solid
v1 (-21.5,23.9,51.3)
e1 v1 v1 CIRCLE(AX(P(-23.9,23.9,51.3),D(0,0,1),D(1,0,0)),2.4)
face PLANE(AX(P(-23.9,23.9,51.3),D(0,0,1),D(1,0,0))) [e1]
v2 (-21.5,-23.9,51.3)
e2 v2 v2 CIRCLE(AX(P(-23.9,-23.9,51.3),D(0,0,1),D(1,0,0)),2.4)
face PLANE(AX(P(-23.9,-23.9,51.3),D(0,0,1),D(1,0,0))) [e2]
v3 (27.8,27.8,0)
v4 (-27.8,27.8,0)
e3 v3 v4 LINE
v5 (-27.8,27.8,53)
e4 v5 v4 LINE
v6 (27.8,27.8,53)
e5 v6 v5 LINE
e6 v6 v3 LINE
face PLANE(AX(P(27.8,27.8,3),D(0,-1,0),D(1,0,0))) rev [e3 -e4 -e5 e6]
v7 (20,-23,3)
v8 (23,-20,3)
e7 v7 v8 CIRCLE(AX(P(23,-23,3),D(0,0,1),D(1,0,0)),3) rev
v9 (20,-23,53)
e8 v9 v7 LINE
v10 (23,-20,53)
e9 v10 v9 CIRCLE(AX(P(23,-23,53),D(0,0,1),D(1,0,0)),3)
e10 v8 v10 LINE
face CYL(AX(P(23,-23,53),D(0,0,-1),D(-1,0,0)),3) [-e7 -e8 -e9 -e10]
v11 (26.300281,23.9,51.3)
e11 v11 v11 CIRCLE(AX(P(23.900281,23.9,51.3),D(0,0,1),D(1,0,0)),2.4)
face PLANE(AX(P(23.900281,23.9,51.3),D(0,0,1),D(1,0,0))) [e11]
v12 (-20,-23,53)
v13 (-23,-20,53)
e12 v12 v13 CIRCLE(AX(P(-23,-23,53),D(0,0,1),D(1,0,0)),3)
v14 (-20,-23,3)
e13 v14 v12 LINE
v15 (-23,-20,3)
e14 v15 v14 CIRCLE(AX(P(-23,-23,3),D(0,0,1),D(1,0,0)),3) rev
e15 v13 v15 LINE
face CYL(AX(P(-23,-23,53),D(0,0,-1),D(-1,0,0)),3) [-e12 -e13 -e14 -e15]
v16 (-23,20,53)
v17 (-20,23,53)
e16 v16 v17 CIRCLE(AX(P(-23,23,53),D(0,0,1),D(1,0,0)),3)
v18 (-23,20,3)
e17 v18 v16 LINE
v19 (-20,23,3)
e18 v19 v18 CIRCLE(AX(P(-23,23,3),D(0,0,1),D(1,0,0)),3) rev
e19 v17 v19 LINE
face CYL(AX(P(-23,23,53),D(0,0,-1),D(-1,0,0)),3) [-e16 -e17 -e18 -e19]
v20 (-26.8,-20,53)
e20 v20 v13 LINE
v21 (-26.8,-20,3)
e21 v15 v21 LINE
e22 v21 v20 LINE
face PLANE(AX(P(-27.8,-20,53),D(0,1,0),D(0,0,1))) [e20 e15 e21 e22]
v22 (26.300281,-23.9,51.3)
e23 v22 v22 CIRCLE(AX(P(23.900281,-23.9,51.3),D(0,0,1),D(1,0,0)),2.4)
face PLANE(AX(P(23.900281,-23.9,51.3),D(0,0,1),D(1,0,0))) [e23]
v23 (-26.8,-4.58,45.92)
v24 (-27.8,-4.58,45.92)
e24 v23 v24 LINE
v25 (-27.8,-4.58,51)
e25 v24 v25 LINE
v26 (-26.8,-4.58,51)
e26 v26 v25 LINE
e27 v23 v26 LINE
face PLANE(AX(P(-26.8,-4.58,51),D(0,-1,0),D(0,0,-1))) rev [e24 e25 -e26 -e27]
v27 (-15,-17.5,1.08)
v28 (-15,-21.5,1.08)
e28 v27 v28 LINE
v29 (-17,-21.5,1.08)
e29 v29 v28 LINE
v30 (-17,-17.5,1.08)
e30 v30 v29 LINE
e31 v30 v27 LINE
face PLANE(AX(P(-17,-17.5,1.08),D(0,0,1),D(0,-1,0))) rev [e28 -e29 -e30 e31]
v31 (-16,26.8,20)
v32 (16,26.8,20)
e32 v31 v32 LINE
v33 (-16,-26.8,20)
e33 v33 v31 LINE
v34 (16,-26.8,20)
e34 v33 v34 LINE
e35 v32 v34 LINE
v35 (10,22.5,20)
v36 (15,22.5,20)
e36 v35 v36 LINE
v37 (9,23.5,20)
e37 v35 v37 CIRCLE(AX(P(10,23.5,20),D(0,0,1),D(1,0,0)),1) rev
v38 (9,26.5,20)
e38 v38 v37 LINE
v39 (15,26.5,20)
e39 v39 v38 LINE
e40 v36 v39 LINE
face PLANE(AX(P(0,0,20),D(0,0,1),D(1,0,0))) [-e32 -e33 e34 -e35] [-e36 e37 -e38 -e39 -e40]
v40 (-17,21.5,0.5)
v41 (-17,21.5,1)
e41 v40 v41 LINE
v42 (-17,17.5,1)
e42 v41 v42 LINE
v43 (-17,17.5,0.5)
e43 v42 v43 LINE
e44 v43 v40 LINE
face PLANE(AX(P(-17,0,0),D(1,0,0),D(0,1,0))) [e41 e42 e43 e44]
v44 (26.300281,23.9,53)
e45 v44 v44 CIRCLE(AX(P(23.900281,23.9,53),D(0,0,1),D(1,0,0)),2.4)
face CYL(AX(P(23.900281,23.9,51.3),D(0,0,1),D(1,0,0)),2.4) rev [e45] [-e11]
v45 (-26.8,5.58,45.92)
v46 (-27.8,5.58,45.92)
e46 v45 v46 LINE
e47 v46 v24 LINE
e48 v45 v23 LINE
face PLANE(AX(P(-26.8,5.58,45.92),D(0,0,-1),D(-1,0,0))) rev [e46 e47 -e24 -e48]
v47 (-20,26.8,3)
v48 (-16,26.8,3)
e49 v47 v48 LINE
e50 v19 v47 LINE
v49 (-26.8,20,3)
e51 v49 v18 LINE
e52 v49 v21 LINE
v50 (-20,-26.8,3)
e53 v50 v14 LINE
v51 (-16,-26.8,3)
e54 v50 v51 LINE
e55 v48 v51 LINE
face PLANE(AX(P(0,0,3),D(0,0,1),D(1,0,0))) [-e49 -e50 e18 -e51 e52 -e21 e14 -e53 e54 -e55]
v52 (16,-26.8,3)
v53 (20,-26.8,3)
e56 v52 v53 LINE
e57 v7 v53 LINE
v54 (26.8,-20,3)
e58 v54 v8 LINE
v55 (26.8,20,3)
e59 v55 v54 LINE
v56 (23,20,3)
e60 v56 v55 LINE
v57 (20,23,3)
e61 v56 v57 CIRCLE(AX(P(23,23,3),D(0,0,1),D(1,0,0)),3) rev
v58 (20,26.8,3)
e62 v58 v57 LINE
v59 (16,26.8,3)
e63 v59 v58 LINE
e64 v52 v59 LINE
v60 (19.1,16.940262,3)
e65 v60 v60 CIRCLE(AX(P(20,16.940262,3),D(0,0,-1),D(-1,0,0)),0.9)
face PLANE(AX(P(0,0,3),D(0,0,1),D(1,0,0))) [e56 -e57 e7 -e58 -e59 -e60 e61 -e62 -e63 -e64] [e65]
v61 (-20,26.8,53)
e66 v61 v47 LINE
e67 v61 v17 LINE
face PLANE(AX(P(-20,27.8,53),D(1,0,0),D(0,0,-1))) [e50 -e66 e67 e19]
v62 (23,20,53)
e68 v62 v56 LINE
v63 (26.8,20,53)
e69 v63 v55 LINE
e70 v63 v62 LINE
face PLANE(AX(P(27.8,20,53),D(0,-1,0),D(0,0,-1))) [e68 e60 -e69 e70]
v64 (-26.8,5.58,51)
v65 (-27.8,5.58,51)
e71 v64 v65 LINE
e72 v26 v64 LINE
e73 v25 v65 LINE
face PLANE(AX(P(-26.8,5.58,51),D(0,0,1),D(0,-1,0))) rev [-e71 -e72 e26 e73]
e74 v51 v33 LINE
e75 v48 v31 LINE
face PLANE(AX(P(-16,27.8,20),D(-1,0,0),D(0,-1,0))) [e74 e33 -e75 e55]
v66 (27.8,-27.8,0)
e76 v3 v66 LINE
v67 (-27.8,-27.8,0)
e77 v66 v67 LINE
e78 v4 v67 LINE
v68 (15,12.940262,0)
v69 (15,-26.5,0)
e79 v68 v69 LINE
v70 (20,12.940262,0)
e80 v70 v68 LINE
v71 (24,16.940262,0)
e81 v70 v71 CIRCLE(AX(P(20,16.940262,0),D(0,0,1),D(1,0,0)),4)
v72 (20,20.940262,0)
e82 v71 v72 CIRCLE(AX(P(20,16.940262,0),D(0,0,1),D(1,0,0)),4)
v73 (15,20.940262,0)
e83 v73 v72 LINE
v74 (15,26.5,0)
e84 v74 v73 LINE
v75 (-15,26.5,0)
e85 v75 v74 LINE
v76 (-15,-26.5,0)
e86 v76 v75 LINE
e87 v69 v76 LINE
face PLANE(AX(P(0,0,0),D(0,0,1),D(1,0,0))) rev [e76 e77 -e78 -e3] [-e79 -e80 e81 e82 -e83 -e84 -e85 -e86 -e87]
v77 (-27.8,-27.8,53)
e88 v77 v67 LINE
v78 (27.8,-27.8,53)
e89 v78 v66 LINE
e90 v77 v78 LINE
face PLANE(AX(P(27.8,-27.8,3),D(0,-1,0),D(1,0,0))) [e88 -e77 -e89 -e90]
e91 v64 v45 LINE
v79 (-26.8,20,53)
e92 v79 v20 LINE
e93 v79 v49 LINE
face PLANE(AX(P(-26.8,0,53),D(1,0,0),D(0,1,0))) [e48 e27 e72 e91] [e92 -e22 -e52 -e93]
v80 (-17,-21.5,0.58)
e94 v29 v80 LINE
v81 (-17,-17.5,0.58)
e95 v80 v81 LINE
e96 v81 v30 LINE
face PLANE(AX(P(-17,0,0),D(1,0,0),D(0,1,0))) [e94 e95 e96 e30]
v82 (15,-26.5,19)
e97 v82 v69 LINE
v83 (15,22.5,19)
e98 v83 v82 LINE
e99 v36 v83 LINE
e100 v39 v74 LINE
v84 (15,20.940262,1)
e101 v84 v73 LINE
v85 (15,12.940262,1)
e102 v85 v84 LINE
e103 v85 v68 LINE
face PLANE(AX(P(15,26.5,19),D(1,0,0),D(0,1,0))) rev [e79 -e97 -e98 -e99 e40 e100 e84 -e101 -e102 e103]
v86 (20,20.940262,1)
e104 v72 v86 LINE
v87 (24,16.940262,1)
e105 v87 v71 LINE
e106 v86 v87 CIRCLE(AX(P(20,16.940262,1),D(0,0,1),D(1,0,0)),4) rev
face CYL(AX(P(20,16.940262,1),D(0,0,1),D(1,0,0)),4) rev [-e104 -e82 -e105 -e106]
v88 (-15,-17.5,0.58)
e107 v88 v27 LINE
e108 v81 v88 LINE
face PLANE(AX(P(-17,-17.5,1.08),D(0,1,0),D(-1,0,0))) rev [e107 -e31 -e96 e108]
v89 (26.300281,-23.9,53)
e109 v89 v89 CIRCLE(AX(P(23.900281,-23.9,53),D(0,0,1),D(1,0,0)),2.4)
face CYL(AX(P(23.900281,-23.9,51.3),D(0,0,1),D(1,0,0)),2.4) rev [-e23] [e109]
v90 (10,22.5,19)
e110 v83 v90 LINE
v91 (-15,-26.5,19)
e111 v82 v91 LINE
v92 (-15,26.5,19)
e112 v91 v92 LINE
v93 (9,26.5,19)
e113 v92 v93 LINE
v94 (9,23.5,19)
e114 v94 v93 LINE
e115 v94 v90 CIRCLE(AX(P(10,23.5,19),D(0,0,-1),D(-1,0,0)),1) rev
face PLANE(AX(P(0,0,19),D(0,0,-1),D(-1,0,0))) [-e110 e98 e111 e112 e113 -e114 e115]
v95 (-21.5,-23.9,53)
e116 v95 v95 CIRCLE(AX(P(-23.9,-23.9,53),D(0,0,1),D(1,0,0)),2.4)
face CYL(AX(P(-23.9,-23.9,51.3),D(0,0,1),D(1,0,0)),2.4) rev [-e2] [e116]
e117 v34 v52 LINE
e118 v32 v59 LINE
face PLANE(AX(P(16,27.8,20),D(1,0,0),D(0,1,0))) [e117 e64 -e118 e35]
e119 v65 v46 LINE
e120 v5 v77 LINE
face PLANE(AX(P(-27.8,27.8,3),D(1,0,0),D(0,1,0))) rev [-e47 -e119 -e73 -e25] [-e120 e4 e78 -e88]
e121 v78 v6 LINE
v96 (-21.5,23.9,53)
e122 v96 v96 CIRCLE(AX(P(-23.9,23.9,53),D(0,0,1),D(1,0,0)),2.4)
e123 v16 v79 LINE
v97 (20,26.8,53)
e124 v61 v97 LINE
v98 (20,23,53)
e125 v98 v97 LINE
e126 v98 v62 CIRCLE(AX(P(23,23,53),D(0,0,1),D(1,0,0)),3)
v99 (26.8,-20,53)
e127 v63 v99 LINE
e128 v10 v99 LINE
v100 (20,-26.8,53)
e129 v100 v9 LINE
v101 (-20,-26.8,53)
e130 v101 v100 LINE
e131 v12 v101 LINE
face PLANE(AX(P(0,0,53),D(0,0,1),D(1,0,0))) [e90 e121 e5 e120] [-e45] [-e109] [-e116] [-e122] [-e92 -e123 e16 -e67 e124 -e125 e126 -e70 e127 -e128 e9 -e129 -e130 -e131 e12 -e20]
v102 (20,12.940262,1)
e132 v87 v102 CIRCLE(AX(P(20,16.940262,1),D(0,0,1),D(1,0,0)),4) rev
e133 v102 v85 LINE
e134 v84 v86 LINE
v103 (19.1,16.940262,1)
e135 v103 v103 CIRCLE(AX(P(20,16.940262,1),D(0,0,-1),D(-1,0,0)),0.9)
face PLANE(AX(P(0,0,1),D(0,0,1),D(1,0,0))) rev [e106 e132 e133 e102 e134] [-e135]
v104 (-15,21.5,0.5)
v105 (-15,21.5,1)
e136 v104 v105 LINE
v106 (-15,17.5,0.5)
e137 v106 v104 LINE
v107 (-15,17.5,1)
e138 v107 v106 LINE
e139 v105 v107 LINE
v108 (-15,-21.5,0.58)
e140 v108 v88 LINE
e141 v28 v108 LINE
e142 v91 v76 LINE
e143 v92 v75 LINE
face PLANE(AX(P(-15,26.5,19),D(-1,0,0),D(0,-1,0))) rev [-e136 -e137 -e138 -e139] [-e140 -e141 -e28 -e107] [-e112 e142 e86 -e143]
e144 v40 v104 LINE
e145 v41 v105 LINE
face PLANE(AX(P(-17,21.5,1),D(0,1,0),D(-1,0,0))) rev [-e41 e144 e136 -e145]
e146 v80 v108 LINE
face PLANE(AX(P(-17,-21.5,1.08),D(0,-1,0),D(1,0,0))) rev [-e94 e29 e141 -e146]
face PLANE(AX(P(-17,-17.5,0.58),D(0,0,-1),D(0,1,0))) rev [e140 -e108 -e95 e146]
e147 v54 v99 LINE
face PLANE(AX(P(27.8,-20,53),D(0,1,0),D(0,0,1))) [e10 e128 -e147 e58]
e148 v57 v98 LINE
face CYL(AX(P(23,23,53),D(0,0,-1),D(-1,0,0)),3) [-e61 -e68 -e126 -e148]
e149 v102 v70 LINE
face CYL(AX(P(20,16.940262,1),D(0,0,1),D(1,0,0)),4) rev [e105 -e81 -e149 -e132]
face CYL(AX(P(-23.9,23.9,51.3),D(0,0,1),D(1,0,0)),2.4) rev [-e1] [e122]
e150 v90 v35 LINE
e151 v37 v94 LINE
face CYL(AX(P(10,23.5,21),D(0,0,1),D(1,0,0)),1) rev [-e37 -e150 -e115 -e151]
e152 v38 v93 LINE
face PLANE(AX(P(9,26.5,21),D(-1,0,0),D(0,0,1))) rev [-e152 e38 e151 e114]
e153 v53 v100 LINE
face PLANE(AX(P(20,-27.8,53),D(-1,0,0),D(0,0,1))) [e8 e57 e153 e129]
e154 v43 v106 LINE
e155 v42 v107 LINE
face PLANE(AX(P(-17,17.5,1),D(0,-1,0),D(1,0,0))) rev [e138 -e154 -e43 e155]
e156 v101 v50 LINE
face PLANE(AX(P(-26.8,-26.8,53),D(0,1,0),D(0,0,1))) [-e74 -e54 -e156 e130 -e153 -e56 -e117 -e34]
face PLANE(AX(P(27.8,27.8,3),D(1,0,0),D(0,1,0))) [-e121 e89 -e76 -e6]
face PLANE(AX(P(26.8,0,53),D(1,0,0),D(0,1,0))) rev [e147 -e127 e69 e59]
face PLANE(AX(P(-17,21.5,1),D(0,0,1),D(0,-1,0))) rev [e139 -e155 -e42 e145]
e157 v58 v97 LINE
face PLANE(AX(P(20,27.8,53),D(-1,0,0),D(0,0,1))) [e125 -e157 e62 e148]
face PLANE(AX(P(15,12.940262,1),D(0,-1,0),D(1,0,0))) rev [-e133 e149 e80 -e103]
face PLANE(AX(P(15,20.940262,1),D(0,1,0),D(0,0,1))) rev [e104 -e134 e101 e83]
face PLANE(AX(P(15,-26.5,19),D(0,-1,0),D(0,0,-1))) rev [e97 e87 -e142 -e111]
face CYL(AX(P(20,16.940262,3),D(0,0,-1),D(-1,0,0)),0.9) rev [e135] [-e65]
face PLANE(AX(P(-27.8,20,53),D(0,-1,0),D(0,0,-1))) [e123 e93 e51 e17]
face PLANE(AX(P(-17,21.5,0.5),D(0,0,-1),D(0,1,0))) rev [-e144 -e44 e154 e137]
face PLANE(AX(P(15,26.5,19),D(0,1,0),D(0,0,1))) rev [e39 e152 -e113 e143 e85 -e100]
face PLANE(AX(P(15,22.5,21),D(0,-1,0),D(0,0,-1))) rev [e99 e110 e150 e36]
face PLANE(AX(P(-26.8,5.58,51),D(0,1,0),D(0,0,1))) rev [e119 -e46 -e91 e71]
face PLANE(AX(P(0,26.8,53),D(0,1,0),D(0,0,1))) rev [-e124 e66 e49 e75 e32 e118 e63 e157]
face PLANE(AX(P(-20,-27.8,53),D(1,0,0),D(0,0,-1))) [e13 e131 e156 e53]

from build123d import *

# Parameters (mm, degrees)
SKICA1_W                  = 55.6
SKICA1_H                  = 55.6
P_IDAT_VYSUNUT_M2_DEPTH   = 3
SKICA14_W                 = 53.6
SKICA14_H                 = 1
P_IDAT_VYSUNUT_M9_DEPTH   = 50
SKICA19_W                 = 7.8
SKICA19_H                 = 7.8
P_IDAT_VYSUNUT_M10_DEPTH  = 53
SKICA20_R                 = 2.4
ODEBRAT_VYSUNUT_M9_DEPTH  = 1.7
ZAOBLIT1_R                = 3
SKICA25_W                 = 32
SKICA25_H                 = 55.6
P_IDAT_VYSUNUT_M12_DEPTH  = 20
SKICA26_W                 = 30
SKICA26_H                 = 53
ODEBRAT_VYSUNUT_M11_DEPTH = 19
SKICA27_W                 = 5.08
SKICA27_H                 = 10.16
ODEBRAT_VYSUNUT_M12_DEPTH = 1
SKICA28_W                 = 9
SKICA28_H                 = 8
ODEBRAT_VYSUNUT_M13_DEPTH = 1
ZAOBLIT3_R                = 4
SKICA29_W                 = 0.5
SKICA29_H                 = 4
ODEBRAT_VYSUNUT_M14_DEPTH = 2
SKICA30_R                 = 0.9
ODEBRAT_VYSUNUT_M15_DEPTH = 2
SKICA31_W                 = 6
SKICA31_H                 = 4
ODEBRAT_VYSUNUT_M16_DEPTH = 2
ZAOBLIT4_R                = 1


with BuildPart() as part:
    # Skica1 → Přidat vysunutím2 (new body)
    with BuildSketch(Plane.XY):
        Rectangle(SKICA1_W, SKICA1_H)
    extrude(amount=P_IDAT_VYSUNUT_M2_DEPTH)

    # Skica14 → Přidat vysunutím9 (add)
    with BuildSketch(Plane.XY.offset(3)):
        Polygon((27.8, 27.8), (-27.8, 27.8), (-27.8, -27.8), (-26.8, -27.8), (-26.8, -26.8), (-26.8, 26.8), (26.8, 26.8), (26.8, -26.8), (26.8, -27.8), (27.8, -27.8), align=None)
        with Locations((0, -27.3)):
            Rectangle(SKICA14_W, SKICA14_H)
    extrude(amount=P_IDAT_VYSUNUT_M9_DEPTH)

    # Skica19 → Přidat vysunutím10 (add)
    with BuildSketch(Plane(origin=(0, 0, 0), x_dir=(-1, 0, 0), z_dir=(0, 0, -1))):
        with Locations((-23.9, 23.9)):
            Rectangle(SKICA19_W, SKICA19_H)
        with Locations((23.9, 23.9)):
            Rectangle(SKICA19_W, SKICA19_H)
        with Locations((-23.9, -23.9)):
            Rectangle(SKICA19_W, SKICA19_H)
        with Locations((23.9, -23.9)):
            Rectangle(SKICA19_W, SKICA19_H)
    extrude(amount=-P_IDAT_VYSUNUT_M10_DEPTH)

    # Skica20 → Odebrat vysunutím9 (cut)
    with BuildSketch(Plane.XY.offset(53)):
        with Locations((-23.9, -23.9)):
            Circle(SKICA20_R)
        with Locations((-23.9, 23.9)):
            Circle(SKICA20_R)
        with Locations((23.900280565, 23.9)):
            Circle(SKICA20_R)
        with Locations((23.900280565, -23.9)):
            Circle(SKICA20_R)
    extrude(amount=-ODEBRAT_VYSUNUT_M9_DEPTH, mode=Mode.SUBTRACT)

    # Zaoblit1
    zaoblit1_edges = [part.edges().sort_by_distance(p)[0] for p in [
        (-20, -20, 28),
        (20, 20, 28),
        (-20, 20, 28),
        (20, -20, 28),
    ]]
    fillet(zaoblit1_edges, radius=ZAOBLIT1_R)

    # Skica25 → Přidat vysunutím12 (add)
    with BuildSketch(Plane(origin=(0, 0, 0), x_dir=(-1, 0, 0), z_dir=(0, 0, -1))):
        Rectangle(SKICA25_W, SKICA25_H)
    extrude(amount=-P_IDAT_VYSUNUT_M12_DEPTH)

    # Skica26 → Odebrat vysunutím11 (cut)
    with BuildSketch(Plane(origin=(0, 0, 0), x_dir=(-1, 0, 0), z_dir=(0, 0, -1))):
        Rectangle(SKICA26_W, SKICA26_H)
    extrude(amount=-ODEBRAT_VYSUNUT_M11_DEPTH, mode=Mode.SUBTRACT)

    # Skica27 → Odebrat vysunutím12 (cut)
    with BuildSketch(Plane.ZY.offset(27.8)):
        with Locations((48.46, 0.5)):
            Rectangle(SKICA27_W, SKICA27_H)
    extrude(amount=-ODEBRAT_VYSUNUT_M12_DEPTH, mode=Mode.SUBTRACT)

    # Skica28 → Odebrat vysunutím13 (cut)
    with BuildSketch(Plane(origin=(0, 0, 0), x_dir=(-1, 0, 0), z_dir=(0, 0, -1))):
        with Locations((-19.5, 16.940262317)):
            Rectangle(SKICA28_W, SKICA28_H)
    extrude(amount=-ODEBRAT_VYSUNUT_M13_DEPTH, mode=Mode.SUBTRACT)

    # Zaoblit3
    zaoblit3_edges = [part.edges().sort_by_distance(p)[0] for p in [
        (24, 12.940262317, 0.5),
        (24, 20.940262317, 0.5),
    ]]
    fillet(zaoblit3_edges, radius=ZAOBLIT3_R - 0.0001)  # a hair under: the kernel refuses the full size

    # Skica29 → Odebrat vysunutím14 (cut)
    with BuildSketch(Plane(origin=(-15, 0, 0), x_dir=(0, 0, -1), z_dir=(1, 0, 0))):
        with Locations((-0.75, 19.5)):
            Rectangle(SKICA29_W, SKICA29_H)
        with Locations((-0.83, -19.5)):
            Rectangle(SKICA29_W, SKICA29_H)
    extrude(amount=-ODEBRAT_VYSUNUT_M14_DEPTH, mode=Mode.SUBTRACT)

    # Skica30 → Odebrat vysunutím15 (cut)
    with BuildSketch(Plane(origin=(0, 0, 1), x_dir=(-1, 0, 0), z_dir=(0, 0, -1))):
        with Locations((-20, 16.940262317)):
            Circle(SKICA30_R)
    extrude(amount=-ODEBRAT_VYSUNUT_M15_DEPTH, mode=Mode.SUBTRACT)

    # Skica31 → Odebrat vysunutím16 (cut)
    with BuildSketch(Plane(origin=(0, 0, 19), x_dir=(-1, 0, 0), z_dir=(0, 0, -1))):
        with Locations((-12, 24.5)):
            Rectangle(SKICA31_W, SKICA31_H)
    extrude(amount=-ODEBRAT_VYSUNUT_M16_DEPTH, mode=Mode.SUBTRACT)

    # Zaoblit4
    zaoblit4_edges = [part.edges().sort_by_distance(p)[0] for p in [
        (9, 22.5, 19.5),
    ]]
    fillet(zaoblit4_edges, radius=ZAOBLIT4_R)


solid = part.part
